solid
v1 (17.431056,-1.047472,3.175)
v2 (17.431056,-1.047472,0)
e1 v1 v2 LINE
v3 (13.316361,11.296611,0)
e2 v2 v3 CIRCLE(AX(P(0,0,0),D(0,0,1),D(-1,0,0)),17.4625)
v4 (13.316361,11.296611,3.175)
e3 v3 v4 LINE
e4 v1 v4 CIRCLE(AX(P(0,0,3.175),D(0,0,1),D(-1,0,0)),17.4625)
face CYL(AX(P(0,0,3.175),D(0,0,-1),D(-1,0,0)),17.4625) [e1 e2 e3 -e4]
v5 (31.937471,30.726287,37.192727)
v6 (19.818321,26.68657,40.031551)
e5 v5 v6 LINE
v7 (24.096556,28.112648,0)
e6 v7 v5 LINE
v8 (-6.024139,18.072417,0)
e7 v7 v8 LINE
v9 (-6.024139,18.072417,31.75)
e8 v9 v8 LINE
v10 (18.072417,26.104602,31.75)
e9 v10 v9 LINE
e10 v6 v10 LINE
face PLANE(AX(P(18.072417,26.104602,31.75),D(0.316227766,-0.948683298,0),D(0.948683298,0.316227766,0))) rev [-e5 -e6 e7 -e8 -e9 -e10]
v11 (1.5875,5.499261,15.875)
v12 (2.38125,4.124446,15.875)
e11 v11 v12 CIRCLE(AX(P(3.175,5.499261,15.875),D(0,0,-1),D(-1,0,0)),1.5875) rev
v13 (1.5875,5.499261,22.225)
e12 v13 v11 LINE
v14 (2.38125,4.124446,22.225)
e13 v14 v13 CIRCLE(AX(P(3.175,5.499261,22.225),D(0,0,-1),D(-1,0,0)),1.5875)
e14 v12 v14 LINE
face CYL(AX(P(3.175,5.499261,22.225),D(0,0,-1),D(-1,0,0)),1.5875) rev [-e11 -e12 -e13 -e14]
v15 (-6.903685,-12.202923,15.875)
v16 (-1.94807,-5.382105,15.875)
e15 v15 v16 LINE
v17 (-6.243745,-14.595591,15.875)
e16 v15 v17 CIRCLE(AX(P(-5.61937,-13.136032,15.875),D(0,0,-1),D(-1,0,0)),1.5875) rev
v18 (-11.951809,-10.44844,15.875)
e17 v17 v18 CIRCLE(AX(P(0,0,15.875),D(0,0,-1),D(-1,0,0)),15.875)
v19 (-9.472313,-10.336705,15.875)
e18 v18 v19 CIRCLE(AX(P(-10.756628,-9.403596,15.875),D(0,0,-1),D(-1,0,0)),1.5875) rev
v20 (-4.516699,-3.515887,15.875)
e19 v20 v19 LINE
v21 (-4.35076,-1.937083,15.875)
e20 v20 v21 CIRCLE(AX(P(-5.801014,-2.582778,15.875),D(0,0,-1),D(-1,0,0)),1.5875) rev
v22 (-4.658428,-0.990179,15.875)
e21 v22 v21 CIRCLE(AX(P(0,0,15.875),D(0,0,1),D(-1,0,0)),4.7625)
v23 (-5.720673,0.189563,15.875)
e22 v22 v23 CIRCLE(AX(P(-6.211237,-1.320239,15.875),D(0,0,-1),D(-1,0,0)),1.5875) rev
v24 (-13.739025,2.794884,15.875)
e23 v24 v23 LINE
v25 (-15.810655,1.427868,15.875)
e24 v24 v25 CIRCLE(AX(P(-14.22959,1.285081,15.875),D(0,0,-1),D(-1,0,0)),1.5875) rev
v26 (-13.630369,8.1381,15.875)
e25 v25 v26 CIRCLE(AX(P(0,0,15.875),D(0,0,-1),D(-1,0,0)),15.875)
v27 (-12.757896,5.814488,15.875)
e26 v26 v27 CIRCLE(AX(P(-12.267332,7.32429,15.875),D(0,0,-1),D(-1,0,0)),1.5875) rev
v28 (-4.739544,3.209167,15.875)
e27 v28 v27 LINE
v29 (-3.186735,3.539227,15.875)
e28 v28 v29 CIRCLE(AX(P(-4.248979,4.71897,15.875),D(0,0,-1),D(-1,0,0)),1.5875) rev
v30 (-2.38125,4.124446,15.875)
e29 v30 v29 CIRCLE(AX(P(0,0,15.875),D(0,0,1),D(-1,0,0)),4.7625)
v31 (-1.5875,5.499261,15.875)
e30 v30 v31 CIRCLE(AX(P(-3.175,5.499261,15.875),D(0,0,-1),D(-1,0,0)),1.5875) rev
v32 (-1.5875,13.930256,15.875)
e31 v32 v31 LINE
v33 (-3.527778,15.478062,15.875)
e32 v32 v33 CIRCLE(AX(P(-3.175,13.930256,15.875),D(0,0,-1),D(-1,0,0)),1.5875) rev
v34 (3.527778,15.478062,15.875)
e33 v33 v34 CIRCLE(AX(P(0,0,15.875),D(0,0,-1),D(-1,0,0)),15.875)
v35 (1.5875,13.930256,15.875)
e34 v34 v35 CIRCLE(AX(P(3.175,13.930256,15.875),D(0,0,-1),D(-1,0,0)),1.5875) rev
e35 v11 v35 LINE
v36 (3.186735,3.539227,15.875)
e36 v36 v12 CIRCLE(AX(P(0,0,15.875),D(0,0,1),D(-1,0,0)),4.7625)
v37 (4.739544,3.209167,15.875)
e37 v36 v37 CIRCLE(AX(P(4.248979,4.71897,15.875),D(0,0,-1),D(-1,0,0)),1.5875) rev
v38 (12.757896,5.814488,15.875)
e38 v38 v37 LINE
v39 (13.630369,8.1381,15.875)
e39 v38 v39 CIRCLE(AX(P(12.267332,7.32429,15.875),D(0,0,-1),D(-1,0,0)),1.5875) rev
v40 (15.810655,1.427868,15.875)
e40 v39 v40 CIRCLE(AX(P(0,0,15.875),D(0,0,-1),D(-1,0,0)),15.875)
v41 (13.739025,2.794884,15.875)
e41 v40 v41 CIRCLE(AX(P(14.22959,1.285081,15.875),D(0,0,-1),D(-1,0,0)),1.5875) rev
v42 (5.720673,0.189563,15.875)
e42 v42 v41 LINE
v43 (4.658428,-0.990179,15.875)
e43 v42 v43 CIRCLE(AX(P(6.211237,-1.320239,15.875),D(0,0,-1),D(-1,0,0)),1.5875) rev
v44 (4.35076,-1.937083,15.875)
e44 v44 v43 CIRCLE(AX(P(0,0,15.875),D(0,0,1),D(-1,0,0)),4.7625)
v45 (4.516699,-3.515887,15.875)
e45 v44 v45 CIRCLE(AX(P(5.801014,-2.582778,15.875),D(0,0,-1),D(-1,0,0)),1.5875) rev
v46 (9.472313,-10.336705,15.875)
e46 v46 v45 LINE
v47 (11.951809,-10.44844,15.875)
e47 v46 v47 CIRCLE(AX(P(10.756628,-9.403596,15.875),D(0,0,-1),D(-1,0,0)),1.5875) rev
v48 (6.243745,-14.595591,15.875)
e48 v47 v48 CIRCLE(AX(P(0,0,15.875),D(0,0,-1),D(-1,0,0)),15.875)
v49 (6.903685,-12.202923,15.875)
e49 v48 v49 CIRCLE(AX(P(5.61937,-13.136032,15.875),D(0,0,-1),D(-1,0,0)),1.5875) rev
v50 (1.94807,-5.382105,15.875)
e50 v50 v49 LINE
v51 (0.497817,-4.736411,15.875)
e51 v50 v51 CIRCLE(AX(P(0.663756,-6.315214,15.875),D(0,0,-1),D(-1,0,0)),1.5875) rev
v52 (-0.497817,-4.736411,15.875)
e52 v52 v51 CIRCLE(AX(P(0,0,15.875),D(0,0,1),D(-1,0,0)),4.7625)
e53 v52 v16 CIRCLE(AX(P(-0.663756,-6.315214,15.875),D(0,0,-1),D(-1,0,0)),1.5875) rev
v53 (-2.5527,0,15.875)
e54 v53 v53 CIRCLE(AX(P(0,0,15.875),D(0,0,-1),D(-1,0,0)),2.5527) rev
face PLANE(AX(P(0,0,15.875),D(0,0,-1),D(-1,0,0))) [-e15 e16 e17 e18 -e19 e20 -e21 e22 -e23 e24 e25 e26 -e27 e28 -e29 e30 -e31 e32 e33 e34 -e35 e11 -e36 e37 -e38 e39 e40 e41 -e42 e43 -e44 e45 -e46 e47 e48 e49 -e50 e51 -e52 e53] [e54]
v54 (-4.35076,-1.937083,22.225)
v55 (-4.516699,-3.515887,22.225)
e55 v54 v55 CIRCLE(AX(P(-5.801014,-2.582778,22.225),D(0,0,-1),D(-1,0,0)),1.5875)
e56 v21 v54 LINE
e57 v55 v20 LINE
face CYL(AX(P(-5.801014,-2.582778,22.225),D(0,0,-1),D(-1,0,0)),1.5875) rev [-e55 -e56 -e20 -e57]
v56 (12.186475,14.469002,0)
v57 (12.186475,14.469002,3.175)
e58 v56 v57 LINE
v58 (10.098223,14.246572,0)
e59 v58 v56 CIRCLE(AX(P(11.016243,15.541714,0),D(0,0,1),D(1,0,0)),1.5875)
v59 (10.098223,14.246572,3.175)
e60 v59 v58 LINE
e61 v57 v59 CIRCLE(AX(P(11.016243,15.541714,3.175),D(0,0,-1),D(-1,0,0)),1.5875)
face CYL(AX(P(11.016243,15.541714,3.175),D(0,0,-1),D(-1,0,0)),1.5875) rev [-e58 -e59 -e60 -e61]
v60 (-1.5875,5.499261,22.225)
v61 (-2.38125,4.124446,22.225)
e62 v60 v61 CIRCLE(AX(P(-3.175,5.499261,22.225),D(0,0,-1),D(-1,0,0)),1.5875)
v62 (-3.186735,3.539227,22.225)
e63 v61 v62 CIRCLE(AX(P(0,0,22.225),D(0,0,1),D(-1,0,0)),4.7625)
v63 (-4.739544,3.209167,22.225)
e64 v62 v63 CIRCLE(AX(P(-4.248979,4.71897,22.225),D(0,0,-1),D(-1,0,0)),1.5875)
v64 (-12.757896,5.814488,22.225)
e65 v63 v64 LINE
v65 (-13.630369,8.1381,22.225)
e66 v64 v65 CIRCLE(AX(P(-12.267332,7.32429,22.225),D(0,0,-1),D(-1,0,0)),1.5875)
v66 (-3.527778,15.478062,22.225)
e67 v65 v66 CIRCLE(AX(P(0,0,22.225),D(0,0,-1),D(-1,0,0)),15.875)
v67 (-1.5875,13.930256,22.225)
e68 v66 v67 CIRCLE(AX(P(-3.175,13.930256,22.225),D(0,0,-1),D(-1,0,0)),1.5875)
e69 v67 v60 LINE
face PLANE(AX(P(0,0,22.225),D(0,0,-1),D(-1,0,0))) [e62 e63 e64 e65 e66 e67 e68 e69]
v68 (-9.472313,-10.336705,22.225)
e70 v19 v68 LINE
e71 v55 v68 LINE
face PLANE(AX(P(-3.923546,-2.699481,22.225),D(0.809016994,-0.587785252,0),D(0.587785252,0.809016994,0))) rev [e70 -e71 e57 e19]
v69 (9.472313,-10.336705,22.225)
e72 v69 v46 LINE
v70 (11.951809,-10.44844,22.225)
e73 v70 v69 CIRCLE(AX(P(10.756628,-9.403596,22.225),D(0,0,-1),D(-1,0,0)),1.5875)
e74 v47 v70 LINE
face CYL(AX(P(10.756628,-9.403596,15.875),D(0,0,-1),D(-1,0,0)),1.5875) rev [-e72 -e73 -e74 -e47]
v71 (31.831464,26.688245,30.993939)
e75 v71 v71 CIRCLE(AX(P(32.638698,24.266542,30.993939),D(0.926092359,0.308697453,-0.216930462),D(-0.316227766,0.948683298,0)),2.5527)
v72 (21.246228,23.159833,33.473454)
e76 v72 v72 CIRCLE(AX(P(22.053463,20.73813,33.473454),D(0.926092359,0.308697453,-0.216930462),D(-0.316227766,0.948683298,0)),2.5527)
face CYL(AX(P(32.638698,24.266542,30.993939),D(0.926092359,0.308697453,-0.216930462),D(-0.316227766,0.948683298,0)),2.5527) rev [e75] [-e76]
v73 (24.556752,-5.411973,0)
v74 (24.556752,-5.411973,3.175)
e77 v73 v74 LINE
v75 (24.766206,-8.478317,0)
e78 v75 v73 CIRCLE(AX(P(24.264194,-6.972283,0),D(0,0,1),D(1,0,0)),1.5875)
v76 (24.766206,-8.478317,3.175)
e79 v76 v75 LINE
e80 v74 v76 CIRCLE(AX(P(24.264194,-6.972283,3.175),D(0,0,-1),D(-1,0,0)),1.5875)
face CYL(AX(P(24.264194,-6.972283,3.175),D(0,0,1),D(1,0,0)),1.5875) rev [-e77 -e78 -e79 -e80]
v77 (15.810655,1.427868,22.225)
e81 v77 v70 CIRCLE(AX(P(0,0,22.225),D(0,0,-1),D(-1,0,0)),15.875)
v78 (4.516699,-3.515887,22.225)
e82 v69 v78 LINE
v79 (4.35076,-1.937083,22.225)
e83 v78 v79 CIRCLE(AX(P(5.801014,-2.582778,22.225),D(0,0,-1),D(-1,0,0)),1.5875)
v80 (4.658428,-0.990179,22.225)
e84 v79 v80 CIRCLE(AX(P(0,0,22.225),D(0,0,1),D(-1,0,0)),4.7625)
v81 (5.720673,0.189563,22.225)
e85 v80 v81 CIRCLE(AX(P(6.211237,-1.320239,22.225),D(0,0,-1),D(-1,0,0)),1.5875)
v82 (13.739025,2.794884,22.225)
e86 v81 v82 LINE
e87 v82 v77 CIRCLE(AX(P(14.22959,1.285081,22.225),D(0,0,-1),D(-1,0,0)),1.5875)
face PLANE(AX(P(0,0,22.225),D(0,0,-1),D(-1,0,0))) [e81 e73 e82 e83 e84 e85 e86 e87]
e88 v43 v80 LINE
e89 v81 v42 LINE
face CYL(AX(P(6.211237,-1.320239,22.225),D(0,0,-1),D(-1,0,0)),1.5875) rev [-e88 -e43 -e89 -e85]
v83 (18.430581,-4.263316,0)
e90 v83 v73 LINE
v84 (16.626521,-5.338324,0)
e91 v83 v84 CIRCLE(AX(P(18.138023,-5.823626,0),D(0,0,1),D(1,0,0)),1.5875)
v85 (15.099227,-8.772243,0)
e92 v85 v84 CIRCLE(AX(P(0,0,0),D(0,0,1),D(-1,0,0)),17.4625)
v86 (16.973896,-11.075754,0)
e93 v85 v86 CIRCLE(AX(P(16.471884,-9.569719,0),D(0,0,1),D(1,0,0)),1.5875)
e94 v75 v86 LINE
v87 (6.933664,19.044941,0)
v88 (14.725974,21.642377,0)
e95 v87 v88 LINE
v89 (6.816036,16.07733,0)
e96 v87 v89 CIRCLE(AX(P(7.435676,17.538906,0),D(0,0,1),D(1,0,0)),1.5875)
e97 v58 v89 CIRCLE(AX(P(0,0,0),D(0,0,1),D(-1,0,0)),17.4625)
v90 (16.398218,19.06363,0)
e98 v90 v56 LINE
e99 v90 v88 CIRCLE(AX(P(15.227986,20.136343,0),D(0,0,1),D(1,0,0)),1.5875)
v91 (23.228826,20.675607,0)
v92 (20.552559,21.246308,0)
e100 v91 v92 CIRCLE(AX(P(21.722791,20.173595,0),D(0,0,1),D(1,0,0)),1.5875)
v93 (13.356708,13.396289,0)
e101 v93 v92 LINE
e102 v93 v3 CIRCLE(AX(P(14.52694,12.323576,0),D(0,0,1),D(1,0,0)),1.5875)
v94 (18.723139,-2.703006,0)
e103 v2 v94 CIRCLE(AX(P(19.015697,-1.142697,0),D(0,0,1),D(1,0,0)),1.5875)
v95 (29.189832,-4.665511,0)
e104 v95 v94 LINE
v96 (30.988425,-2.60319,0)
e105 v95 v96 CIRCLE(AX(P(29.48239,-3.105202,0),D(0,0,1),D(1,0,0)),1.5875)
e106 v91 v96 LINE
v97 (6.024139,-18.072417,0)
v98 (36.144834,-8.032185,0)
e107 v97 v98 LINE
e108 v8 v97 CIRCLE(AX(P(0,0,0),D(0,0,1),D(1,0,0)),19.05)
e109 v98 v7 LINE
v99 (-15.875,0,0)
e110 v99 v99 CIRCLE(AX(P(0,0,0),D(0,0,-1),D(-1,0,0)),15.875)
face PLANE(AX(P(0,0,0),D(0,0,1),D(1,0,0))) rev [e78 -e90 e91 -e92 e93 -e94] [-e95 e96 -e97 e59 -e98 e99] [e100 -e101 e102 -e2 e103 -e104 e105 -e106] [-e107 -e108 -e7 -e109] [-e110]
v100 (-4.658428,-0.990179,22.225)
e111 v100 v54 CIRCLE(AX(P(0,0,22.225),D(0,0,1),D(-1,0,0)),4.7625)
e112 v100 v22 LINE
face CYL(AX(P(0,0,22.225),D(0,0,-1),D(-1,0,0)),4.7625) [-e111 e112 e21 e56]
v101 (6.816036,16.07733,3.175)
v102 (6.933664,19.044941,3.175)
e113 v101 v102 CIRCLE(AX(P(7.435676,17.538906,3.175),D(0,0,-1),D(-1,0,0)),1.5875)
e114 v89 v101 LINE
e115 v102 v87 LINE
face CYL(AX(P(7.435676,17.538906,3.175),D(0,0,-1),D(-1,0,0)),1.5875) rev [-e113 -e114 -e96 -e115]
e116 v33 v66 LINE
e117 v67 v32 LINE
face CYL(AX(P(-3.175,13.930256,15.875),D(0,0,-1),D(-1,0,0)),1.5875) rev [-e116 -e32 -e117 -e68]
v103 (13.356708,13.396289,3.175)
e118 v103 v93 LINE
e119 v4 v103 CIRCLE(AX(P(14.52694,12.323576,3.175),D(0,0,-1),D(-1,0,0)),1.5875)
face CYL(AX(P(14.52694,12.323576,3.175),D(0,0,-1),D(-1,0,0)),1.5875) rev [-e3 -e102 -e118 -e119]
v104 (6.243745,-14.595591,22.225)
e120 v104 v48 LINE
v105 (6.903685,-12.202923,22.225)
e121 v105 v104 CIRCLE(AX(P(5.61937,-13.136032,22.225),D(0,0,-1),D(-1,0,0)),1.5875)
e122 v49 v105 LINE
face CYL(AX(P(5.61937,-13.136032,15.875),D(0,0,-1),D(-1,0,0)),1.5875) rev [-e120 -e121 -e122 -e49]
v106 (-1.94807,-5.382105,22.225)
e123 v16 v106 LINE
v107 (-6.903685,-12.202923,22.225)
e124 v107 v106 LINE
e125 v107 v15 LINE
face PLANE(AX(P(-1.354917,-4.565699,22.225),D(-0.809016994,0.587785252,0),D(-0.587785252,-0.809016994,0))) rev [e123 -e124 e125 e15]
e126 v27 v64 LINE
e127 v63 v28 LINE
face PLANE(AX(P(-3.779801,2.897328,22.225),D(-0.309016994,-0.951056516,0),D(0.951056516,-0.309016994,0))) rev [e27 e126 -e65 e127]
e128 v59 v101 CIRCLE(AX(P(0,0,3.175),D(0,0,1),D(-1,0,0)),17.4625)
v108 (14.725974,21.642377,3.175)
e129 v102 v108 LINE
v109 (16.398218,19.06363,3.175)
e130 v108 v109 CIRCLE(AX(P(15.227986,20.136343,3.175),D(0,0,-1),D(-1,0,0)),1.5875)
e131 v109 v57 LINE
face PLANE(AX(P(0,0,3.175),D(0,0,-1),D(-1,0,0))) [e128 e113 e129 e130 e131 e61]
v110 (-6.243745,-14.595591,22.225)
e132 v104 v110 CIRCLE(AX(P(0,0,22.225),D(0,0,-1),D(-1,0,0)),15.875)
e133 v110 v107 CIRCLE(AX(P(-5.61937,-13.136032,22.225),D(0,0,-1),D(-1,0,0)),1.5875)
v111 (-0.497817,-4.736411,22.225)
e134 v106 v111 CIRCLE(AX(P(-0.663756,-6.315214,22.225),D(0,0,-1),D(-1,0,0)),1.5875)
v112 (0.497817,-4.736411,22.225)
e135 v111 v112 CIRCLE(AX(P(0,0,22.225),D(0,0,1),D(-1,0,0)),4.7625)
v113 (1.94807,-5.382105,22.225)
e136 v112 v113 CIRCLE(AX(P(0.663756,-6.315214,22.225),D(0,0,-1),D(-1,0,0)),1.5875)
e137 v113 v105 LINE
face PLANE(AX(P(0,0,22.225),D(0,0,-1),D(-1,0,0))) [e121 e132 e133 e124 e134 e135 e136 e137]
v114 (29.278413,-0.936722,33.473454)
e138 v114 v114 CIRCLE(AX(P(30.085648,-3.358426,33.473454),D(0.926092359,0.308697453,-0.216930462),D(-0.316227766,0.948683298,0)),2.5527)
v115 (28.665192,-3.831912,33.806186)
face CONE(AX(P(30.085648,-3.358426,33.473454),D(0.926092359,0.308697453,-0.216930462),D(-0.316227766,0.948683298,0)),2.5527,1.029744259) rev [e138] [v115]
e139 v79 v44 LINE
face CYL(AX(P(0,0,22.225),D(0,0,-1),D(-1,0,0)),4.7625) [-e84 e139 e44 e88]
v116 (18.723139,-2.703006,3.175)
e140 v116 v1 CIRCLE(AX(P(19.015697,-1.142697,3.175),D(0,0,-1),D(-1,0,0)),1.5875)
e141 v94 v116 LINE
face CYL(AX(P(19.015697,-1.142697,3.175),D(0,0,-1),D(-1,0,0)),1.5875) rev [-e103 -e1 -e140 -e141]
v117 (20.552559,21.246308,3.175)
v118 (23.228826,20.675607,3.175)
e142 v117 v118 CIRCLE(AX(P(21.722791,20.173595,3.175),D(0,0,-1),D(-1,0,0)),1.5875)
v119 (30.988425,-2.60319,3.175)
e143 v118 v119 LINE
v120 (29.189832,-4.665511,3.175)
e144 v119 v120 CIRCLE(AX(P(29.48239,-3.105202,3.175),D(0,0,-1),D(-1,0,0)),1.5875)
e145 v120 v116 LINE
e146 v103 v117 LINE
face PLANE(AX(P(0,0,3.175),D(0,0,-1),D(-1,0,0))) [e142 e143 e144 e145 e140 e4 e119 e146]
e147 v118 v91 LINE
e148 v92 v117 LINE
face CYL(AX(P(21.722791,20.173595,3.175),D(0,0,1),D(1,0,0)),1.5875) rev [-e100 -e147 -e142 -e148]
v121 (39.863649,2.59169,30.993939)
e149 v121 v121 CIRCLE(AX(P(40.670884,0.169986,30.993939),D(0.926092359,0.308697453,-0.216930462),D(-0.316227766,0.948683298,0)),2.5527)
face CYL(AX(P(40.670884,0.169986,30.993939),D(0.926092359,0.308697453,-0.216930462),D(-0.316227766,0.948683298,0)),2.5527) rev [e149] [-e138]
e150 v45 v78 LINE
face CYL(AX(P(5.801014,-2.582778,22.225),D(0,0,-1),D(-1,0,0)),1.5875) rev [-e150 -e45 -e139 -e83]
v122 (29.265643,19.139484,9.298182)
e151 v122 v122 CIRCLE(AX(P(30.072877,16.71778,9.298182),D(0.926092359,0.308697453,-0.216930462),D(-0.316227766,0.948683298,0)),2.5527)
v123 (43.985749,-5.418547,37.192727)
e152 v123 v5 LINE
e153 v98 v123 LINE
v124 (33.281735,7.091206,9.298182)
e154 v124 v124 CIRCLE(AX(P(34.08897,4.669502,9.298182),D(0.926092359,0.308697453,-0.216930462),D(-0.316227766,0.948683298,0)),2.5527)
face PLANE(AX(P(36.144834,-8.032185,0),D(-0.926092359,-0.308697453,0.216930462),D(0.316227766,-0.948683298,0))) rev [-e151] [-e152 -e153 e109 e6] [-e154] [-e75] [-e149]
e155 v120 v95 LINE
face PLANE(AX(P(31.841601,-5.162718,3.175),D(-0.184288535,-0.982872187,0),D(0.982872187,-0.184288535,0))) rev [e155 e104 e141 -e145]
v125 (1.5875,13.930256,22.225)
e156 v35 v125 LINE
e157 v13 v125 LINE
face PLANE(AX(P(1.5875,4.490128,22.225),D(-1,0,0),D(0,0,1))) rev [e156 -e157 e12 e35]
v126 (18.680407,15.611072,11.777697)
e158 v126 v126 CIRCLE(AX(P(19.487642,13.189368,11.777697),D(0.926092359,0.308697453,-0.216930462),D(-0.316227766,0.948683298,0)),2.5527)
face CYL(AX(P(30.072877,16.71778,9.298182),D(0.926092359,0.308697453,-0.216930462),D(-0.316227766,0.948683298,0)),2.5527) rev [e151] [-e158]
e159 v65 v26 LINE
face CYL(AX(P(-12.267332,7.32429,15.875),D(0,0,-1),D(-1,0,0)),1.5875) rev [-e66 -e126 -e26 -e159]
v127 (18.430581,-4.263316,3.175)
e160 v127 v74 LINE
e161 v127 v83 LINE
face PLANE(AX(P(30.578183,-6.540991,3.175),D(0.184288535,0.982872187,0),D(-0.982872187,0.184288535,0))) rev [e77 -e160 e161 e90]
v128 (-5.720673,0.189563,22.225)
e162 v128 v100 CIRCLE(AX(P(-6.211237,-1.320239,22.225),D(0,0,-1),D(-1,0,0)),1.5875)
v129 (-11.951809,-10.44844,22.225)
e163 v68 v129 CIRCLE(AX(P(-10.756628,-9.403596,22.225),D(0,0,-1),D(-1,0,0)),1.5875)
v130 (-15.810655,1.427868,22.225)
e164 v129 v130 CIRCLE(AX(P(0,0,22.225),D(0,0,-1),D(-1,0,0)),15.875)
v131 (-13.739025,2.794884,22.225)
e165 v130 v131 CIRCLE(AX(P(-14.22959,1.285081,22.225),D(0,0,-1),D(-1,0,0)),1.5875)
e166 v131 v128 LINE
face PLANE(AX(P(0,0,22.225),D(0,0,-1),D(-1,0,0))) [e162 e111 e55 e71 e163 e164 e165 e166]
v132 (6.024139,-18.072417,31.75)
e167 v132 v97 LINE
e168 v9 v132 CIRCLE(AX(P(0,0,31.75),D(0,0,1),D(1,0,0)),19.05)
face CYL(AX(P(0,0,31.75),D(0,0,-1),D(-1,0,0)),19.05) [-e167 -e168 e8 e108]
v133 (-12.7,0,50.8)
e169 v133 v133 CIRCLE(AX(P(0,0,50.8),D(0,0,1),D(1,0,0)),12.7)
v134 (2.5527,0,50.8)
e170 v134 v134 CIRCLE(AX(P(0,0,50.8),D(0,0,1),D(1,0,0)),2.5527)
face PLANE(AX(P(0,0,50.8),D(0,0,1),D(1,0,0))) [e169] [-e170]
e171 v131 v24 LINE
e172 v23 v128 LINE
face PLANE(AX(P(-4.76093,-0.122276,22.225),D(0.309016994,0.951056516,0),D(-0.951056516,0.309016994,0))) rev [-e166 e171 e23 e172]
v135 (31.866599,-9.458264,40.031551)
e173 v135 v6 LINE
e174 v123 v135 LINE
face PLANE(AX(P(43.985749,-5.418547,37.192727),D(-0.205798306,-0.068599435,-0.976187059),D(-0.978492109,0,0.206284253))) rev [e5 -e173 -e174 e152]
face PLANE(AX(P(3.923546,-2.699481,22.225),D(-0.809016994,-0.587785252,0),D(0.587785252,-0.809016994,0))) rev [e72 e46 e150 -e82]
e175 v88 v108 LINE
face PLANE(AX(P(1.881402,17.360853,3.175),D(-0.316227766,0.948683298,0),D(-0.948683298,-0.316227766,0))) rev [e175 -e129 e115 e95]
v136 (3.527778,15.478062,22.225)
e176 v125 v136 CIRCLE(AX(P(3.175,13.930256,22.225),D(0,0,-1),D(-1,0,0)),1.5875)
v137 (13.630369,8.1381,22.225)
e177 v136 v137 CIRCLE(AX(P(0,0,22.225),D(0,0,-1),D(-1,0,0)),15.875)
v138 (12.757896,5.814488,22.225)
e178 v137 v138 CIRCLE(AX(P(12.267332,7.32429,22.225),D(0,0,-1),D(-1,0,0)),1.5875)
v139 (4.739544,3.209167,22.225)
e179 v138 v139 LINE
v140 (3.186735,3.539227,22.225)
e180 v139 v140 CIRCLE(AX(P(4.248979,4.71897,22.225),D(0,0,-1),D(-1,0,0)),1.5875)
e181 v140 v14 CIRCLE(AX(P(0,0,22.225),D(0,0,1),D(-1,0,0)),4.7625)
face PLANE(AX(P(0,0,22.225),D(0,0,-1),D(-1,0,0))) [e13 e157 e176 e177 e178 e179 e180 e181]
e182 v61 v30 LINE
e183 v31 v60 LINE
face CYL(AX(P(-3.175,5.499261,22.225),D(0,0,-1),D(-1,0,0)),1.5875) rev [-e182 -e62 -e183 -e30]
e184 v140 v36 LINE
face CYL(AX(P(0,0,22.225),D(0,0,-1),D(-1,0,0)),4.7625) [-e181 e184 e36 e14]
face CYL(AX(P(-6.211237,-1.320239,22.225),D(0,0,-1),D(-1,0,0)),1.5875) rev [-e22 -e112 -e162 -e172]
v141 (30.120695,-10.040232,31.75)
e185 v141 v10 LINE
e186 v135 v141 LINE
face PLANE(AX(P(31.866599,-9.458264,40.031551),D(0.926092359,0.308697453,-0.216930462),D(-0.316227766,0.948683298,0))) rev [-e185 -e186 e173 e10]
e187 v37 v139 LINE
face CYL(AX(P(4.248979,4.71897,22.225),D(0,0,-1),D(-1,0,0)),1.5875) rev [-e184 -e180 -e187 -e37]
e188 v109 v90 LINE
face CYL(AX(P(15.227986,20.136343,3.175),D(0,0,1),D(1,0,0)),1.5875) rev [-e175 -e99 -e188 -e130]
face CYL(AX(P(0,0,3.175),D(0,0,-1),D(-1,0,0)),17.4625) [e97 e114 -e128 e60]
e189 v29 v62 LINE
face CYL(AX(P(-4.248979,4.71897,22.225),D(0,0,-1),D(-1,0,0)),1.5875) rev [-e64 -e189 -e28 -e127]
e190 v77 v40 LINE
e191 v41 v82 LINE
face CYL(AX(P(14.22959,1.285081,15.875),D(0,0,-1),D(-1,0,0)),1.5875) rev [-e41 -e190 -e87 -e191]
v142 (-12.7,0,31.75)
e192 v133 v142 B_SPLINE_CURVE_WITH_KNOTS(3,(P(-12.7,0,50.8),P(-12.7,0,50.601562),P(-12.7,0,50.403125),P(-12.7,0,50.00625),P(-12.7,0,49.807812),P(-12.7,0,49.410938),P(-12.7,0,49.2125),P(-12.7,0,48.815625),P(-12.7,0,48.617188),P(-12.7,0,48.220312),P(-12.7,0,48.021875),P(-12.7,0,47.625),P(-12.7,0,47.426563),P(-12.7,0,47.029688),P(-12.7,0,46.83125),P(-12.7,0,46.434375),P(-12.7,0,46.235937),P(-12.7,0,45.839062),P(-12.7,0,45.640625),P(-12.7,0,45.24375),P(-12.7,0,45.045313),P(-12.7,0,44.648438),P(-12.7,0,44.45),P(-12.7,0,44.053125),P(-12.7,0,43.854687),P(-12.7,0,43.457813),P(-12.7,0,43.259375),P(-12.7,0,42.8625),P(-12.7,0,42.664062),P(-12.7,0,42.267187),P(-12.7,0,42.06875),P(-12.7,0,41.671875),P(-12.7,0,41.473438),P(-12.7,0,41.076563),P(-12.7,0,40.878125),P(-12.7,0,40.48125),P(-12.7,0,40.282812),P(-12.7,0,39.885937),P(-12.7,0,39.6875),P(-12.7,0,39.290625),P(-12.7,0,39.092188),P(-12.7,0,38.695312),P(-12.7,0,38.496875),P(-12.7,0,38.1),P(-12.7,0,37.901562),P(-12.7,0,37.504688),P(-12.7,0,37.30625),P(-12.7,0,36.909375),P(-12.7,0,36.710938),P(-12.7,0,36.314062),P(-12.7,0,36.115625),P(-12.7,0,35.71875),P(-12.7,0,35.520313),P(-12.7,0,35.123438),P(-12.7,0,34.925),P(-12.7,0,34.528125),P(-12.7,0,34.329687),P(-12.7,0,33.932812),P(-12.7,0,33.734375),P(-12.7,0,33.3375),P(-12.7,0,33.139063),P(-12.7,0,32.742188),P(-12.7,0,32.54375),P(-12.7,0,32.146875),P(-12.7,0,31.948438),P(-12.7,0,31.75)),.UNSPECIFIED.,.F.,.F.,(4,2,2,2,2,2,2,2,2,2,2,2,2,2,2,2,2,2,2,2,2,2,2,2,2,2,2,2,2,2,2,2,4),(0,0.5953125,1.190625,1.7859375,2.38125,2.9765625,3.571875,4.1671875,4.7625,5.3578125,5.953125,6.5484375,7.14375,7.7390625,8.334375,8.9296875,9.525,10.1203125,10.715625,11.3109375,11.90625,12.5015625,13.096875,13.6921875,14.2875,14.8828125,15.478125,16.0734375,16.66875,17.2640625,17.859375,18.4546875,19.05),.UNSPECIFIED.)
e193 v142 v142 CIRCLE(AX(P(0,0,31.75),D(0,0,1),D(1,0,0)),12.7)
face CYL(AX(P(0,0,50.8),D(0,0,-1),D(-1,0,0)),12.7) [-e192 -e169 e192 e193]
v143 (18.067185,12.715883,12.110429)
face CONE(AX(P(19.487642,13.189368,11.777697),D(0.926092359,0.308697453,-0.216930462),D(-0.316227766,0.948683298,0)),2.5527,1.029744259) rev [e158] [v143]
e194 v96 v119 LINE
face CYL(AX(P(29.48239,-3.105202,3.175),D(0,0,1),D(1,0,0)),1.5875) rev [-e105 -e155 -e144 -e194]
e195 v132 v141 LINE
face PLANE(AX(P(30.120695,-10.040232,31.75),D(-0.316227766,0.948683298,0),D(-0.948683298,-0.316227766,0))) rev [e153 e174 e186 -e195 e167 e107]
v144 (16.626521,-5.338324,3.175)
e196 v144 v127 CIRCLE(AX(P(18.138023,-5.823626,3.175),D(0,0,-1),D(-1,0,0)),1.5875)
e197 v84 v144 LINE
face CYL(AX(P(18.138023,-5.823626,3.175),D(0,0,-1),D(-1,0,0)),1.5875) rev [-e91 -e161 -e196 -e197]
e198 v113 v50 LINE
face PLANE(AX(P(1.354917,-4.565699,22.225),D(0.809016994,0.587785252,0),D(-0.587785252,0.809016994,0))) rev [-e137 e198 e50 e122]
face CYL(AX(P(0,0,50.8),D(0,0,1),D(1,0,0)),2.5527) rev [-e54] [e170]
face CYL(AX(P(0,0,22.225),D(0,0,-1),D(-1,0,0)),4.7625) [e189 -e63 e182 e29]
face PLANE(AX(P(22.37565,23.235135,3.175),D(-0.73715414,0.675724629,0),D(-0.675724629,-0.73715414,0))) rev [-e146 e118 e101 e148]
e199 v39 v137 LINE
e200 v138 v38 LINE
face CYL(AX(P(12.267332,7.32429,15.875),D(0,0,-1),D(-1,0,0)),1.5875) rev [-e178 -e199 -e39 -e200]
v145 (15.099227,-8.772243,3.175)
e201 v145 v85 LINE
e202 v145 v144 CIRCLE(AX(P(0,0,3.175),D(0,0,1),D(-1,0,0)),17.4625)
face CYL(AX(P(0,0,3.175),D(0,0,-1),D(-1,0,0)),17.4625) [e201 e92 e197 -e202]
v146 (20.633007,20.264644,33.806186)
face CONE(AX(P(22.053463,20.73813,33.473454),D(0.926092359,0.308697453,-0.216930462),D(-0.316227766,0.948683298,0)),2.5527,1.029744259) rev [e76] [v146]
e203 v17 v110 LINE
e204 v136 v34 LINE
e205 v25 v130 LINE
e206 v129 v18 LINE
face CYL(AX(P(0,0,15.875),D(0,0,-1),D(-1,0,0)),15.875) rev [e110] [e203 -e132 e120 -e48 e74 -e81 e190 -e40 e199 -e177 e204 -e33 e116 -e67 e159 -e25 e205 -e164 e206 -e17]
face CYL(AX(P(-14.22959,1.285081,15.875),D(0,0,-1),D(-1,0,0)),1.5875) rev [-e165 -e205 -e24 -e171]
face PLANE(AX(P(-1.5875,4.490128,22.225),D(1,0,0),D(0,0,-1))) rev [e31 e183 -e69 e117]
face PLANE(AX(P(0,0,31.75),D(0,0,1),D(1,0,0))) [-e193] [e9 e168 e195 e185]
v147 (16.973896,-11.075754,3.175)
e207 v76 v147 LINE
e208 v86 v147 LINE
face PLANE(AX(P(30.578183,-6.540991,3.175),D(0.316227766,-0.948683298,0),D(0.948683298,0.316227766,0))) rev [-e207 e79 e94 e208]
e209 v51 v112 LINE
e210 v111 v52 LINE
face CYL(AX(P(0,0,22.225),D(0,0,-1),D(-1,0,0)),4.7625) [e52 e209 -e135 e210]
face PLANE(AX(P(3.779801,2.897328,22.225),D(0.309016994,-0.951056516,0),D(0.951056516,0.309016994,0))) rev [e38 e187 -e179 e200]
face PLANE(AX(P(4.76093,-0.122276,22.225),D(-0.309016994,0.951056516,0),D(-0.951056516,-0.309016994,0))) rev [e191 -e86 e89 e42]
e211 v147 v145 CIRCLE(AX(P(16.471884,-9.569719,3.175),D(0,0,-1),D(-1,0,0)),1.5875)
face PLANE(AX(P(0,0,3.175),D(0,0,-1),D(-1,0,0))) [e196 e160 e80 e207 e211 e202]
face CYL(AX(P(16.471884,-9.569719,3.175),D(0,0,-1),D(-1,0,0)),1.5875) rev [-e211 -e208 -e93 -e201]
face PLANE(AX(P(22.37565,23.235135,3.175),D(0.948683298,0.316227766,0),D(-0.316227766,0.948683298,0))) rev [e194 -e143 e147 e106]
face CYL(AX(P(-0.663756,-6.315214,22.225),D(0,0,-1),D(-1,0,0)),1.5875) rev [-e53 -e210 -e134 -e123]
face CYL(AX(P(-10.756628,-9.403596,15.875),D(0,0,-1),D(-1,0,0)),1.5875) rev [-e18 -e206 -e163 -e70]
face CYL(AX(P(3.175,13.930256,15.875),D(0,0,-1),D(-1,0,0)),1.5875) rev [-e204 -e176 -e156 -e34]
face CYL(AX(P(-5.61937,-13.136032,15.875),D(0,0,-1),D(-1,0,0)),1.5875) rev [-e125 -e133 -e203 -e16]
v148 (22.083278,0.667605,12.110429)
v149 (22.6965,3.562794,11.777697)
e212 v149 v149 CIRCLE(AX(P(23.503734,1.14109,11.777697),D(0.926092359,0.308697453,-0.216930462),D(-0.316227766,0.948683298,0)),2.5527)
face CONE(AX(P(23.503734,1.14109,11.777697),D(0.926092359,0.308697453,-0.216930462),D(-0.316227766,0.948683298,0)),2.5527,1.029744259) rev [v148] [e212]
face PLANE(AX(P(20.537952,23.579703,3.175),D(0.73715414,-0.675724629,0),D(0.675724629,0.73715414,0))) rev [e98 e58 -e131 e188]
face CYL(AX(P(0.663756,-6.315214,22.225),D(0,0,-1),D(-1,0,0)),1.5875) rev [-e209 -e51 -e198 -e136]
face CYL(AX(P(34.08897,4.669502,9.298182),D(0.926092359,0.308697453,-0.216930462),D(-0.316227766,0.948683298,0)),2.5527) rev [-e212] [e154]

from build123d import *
from build123d.topology import SkipClean

# Parameters (mm, degrees)
BOSS_EXTRUDE1_DEPTH         = 31.75
BOSS_EXTRUDE4_DEPTH         = 38.1
SKETCH11_R                  = 12.7
BOSS_EXTRUDE5_DEPTH         = 19.05
F_1_4_20_TAPPED_HOLE3_D     = 5.1054
F_1_4_20_TAPPED_HOLE3_DEPTH = 38.1
F_1_4_20_TAPPED_HOLE3_TIP   = 1.533816902
F_1_4_20_TAPPED_HOLE4_D     = 5.1054
F_1_4_20_TAPPED_HOLE4_DEPTH = 11.43
F_1_4_20_TAPPED_HOLE4_TIP   = 1.533816902
CUT_EXTRUDE3_DEPTH          = 3.175
SKETCH17_R                  = 15.875
CUT_EXTRUDE4_DEPTH          = 15.875
FILLET3_R                   = 1.5875
CUT_EXTRUDE5_DEPTH          = 6.35
FILLET4_R                   = 1.5875


with BuildPart() as part:
    # Sketch1 → Boss-Extrude1 (new body)
    with BuildSketch(Plane.XY):
        with BuildLine():
            Line((18.072416828, 26.104602085), (30.120694713, -10.040231571))
            Line((30.120694713, -10.040231571), (6.024138943, -18.072416828))
            ThreePointArc((6.024138943, -18.072416828), (-18.072416828, -6.024138943), (-6.024138943, 18.072416828))
            Line((-6.024138943, 18.072416828), (18.072416828, 26.104602085))
        make_face()
    extrude(amount=BOSS_EXTRUDE1_DEPTH)

    # Sketch10 → Boss-Extrude4 (add)
    with BuildSketch(Plane(origin=(-6.024138943, 18.072416828, 0), x_dir=(0.9486832980505138, 0.31622776601683816, 0), z_dir=(-0.31622776601683816, 0.9486832980505138, 0))):
        Polygon((25.4, 0), (31.75, 0), (40.015050599, -37.192726958), (27.240344607, -40.031550568), (25.4, -31.75), align=None)
    extrude(amount=-BOSS_EXTRUDE4_DEPTH)

    # Sketch11 → Boss-Extrude5 (add)
    with BuildSketch(Plane.XY.offset(31.75)):
        with Locations(Location((0, 0, 0), (0, 0, 180))):
            Circle(SKETCH11_R)
    extrude(amount=BOSS_EXTRUDE5_DEPTH)

    # 1/4-20 Tapped Hole3
    with Locations(Plane.XY.offset(50.8)):
        with Locations((0, 0)):
            Hole(F_1_4_20_TAPPED_HOLE3_D / 2, depth=F_1_4_20_TAPPED_HOLE3_DEPTH)
            with Locations((0, 0, -(F_1_4_20_TAPPED_HOLE3_DEPTH + F_1_4_20_TAPPED_HOLE3_TIP / 2))):  # 118° drill point
                Cone(0, F_1_4_20_TAPPED_HOLE3_D / 2, F_1_4_20_TAPPED_HOLE3_TIP, mode=Mode.SUBTRACT)

    # 1/4-20 Tapped Hole4
    with Locations(Plane(origin=(28.703250202, 9.567750067, -6.723529533), x_dir=(-0.2057983060639255, -0.06859943535464187, -0.9761870592720655), z_dir=(0.9260923589044555, 0.30869745296815215, -0.21693046192214882))):
        with Locations((-38.637542166, 12.7), (-16.412542166, 6.35), (-16.412542166, -6.35), (-38.637542166, -12.7)):
            Hole(F_1_4_20_TAPPED_HOLE4_D / 2, depth=F_1_4_20_TAPPED_HOLE4_DEPTH)
            with Locations((0, 0, -(F_1_4_20_TAPPED_HOLE4_DEPTH + F_1_4_20_TAPPED_HOLE4_TIP / 2))):  # 118° drill point
                Cone(0, F_1_4_20_TAPPED_HOLE4_D / 2, F_1_4_20_TAPPED_HOLE4_TIP, mode=Mode.SUBTRACT)

    # Sketch16 → Cut-Extrude3 (cut)
    with BuildSketch(Plane(origin=(0, 0, 0), x_dir=(-1, 0, 0), z_dir=(0, 0, -1))):
        with BuildLine():
            Line((-30.578183366, -6.540991497), (-16.999386581, -3.994967099))
            ThreePointArc((-16.999386581, -3.994967099), (-15.110000404, -8.753673173), (-11.921633961, -12.759841298))
            Line((-11.921633961, -12.759841298), (-30.578183366, -6.540991497))
        make_face()
        with BuildLine():
            Line((-31.84160072, -5.162718019), (-17.29194463, -2.434657503))
            ThreePointArc((-17.29194463, -2.434657503), (-16.566382092, 5.522127364), (-12.372761203, 12.32289278))
            Line((-12.372761203, 12.32289278), (-22.375649764, 23.235134847))
            Line((-22.375649764, 23.235134847), (-31.84160072, -5.162718019))
        make_face()
        with BuildLine():
            Line((-1.88140239, 17.360853415), (-20.537951794, 23.579703217))
            Line((-20.537951794, 23.579703217), (-11.202529005, 13.395605628))
            ThreePointArc((-11.202529005, 13.395605628), (-6.83579642, 16.068938781), (-1.88140239, 17.360853415))
        make_face()
    extrude(amount=-CUT_EXTRUDE3_DEPTH, mode=Mode.SUBTRACT)

    # Sketch17 → Cut-Extrude4 (cut)
    with BuildSketch(Plane(origin=(0, 0, 0), x_dir=(-1, 0, 0), z_dir=(0, 0, -1))):
        Circle(SKETCH17_R)
    extrude(amount=-CUT_EXTRUDE4_DEPTH, mode=Mode.SUBTRACT)

    # Fillet3
    fillet3_edges = [part.edges().sort_by_distance(p)[0] for p in [
        (31.84160072, -5.162718019, 1.5875),
        (22.375649764, 23.235134847, 1.5875),
        (12.372761203, 12.32289278, 1.5875),
        (17.29194463, -2.434657503, 1.5875),
        (11.202529005, 13.395605628, 1.5875),
        (20.537951794, 23.579703217, 1.5875),
        (1.88140239, 17.360853415, 1.5875),
        (16.999386581, -3.994967099, 1.5875),
        (11.921633961, -12.759841298, 1.5875),
        (30.578183366, -6.540991497, 1.5875),
    ]]
    fillet(fillet3_edges, radius=FILLET3_R)

    # Sketch19 → Cut-Extrude5 (cut)
    with SkipClean():  # the faces are left unmerged after this step: merging them gives an invalid solid
        with BuildSketch(Plane(origin=(0, 0, 15.875), x_dir=(-1, 0, 0), z_dir=(0, 0, -1))):
            with BuildLine():
                Line((1.5875, 4.490128061), (1.5875, 15.795425564))
                ThreePointArc((1.5875, 15.795425564), (9.33109088, 12.843144786), (14.531777932, 6.390857152))
                Line((14.531777932, 6.390857152), (3.779801072, 2.897328097))
                ThreePointArc((3.779801072, 2.897328097), (2.799327264, 3.852943436), (1.5875, 4.490128061))
            make_face()
            with BuildLine():
                Line((-1.5875, 4.490128061), (-1.5875, 15.795425564))
                ThreePointArc((-1.5875, 15.795425564), (-9.33109088, 12.843144786), (-14.531777932, 6.390857152))
                Line((-14.531777932, 6.390857152), (-3.779801072, 2.897328097))
                ThreePointArc((-3.779801072, 2.897328097), (-2.799327264, 3.852943436), (-1.5875, 4.490128061))
            make_face()
            with BuildLine():
                Line((4.76093003, -0.122276342), (15.512906889, 3.371252713))
                ThreePointArc((15.512906889, 3.371252713), (15.098022196, -4.905644786), (10.568632679, -11.845658627))
                Line((10.568632679, -11.845658627), (3.923545533, -2.69948082))
                ThreePointArc((3.923545533, -2.69948082), (4.529406659, -1.471693436), (4.76093003, -0.122276342))
            make_face()
            with BuildLine():
                Line((1.354916576, -4.565698996), (8.000003722, -13.711876803))
                ThreePointArc((8.000003722, -13.711876803), (0, -15.875), (-8.000003722, -13.711876803))
                Line((-8.000003722, -13.711876803), (-1.354916576, -4.565698996))
                ThreePointArc((-1.354916576, -4.565698996), (0, -4.7625), (1.354916576, -4.565698996))
            make_face()
            with BuildLine():
                Line((-3.923545533, -2.69948082), (-10.568632679, -11.845658627))
                ThreePointArc((-10.568632679, -11.845658627), (-15.098022196, -4.905644786), (-15.512906889, 3.371252713))
                Line((-15.512906889, 3.371252713), (-4.76093003, -0.122276342))
                ThreePointArc((-4.76093003, -0.122276342), (-4.529406659, -1.471693436), (-3.923545533, -2.69948082))
            make_face()
        extrude(amount=-CUT_EXTRUDE5_DEPTH, mode=Mode.SUBTRACT)

    # Fillet4
    # the kernel refuses this fillet: 1.5875 mm, written as the material it adds along each edge
    with BuildSketch(Plane(origin=(-3.779801072, 2.897328097, 15.875), x_dir=(0.678616300980504, 0.7344929652784552, 0), z_dir=(0, 0, 1)), Plane(origin=(1.5875, 4.490128061, 15.875), x_dir=(0.9082482904638647, -0.4184316465917308, 0), z_dir=(0, 0, 1)), Plane(origin=(1.354916576, -4.565698996, 15.875), x_dir=(-0.9807362530563359, -0.1953366374775062, 0), z_dir=(0, 0, 1)), Plane(origin=(4.76093003, -0.122276342, 15.875), x_dir=(-0.1172879872498498, -0.9930979448407287, 0), z_dir=(0, 0, 1))) as fillet4_piece_1:
        with BuildLine():
            CenterArc((1.019590872, 1.580803791), FILLET4_R, 204.735610317, 60)
            Line((-0.422253289, 0.916543552), (0, 0))
            ThreePointArc((0, 0), (0.436967517, 0.020088626), (0.873935033, 0))
        make_face()
    extrude(amount=8.872833134)
    with BuildSketch(Plane(origin=(-1.5875, 4.490128061, 15.875), x_dir=(0, 1, 0), z_dir=(0, 0, 1)), Plane(origin=(3.779801072, 2.897328097, 15.875), x_dir=(0.9510565162951539, 0.30901699437494645, 0), z_dir=(0, 0, 1)), Plane(origin=(-4.76093003, -0.122276342, 15.875), x_dir=(-0.9510565162951536, 0.3090169943749475, 0), z_dir=(0, 0, 1)), Plane(origin=(-1.354916576, -4.565698996, 15.875), x_dir=(-0.5877852522924731, -0.8090169943749473, 0), z_dir=(0, 0, 1)), Plane(origin=(3.923545533, -2.69948082, 15.875), x_dir=(0.5877852522924732, -0.8090169943749472, 0), z_dir=(0, 0, 1))) as fillet4_piece_2:
        with BuildLine():
            CenterArc((1.009133253, 1.5875), FILLET4_R, 210, 60)
            ThreePointArc((-0.365682075, 0.79375), (-0.164595577, 0.405280717), (0, 0))
            Line((0, 0), (1.009133253, 0))
        make_face()
    extrude(amount=8.872833134)
    with BuildSketch(Plane(origin=(-1.5875, 15.795425564, 15.875), x_dir=(-0.9868856549354627, -0.16142089109716581, 0), z_dir=(0, 0, 1)), Plane(origin=(14.531777932, 6.390857152, 15.875), x_dir=(-0.4584848292240369, 0.8887022343684108, 0), z_dir=(0, 0, 1)), Plane(origin=(-15.512906889, 3.371252713, 15.875), x_dir=(-0.15144404853577972, -0.9884658315607537, 0), z_dir=(0, 0, 1)), Plane(origin=(-8.000003722, -13.711876803, 15.875), x_dir=(0.8932880855464623, -0.4494845895253098, 0), z_dir=(0, 0, 1)), Plane(origin=(10.568632679, -11.845658627, 15.875), x_dir=(0.7035264471488165, 0.7106690778148178, 0), z_dir=(0, 0, 1))) as fillet4_piece_3:
        with BuildLine():
            CenterArc((1.867758316, 1.584453457), FILLET4_R, 170.710620558, 102.839588407)
            Line((0.301077339, 1.840709121), (0, 0))
            ThreePointArc((0, 0), (0.983030693, -0.030465433), (1.966061385, 0))
        make_face()
    extrude(amount=11.265153463)
    with BuildSketch(Plane(origin=(-14.531777932, 6.390857152, 15.875), x_dir=(0.45848482922403855, 0.88870223436841, 0), z_dir=(0, 0, 1)), Plane(origin=(1.5875, 15.795425564, 15.875), x_dir=(0.9868856549354627, -0.16142089109716573, 0), z_dir=(0, 0, 1)), Plane(origin=(-10.568632679, -11.845658627, 15.875), x_dir=(-0.7035264471488155, 0.7106690778148187, 0), z_dir=(0, 0, 1)), Plane(origin=(8.000003722, -13.711876803, 15.875), x_dir=(-0.8932880855464624, -0.4494845895253094, 0), z_dir=(0, 0, 1)), Plane(origin=(15.512906889, 3.371252713, 15.875), x_dir=(0.1514440485357779, -0.988465831560754, 0), z_dir=(0, 0, 1))) as fillet4_piece_4:
        with BuildLine():
            CenterArc((1.867758316, -1.584453457), FILLET4_R, 86.449791035, 102.839588407)
            Line((0.301077339, -1.840709121), (0, 0))
            ThreePointArc((0, 0), (0.983030693, 0.030465433), (1.966061385, 0))
        make_face()
    extrude(amount=11.265153463)
    with BuildSketch(Plane(origin=(-3.923545533, -2.69948082, 15.875), x_dir=(-0.5877852522924727, -0.8090169943749477, 0), z_dir=(0, 0, 1))) as fillet4_piece_5:
        with BuildLine():
            CenterArc((1.009133253, -1.5875), FILLET4_R, 90, 60)
            ThreePointArc((-0.365682075, -0.79375), (-0.164595577, -0.405280717), (0, 0))
            Line((0, 0), (1.009133253, 0))
        make_face()
    extrude(amount=8.872833134)


solid = part.part
